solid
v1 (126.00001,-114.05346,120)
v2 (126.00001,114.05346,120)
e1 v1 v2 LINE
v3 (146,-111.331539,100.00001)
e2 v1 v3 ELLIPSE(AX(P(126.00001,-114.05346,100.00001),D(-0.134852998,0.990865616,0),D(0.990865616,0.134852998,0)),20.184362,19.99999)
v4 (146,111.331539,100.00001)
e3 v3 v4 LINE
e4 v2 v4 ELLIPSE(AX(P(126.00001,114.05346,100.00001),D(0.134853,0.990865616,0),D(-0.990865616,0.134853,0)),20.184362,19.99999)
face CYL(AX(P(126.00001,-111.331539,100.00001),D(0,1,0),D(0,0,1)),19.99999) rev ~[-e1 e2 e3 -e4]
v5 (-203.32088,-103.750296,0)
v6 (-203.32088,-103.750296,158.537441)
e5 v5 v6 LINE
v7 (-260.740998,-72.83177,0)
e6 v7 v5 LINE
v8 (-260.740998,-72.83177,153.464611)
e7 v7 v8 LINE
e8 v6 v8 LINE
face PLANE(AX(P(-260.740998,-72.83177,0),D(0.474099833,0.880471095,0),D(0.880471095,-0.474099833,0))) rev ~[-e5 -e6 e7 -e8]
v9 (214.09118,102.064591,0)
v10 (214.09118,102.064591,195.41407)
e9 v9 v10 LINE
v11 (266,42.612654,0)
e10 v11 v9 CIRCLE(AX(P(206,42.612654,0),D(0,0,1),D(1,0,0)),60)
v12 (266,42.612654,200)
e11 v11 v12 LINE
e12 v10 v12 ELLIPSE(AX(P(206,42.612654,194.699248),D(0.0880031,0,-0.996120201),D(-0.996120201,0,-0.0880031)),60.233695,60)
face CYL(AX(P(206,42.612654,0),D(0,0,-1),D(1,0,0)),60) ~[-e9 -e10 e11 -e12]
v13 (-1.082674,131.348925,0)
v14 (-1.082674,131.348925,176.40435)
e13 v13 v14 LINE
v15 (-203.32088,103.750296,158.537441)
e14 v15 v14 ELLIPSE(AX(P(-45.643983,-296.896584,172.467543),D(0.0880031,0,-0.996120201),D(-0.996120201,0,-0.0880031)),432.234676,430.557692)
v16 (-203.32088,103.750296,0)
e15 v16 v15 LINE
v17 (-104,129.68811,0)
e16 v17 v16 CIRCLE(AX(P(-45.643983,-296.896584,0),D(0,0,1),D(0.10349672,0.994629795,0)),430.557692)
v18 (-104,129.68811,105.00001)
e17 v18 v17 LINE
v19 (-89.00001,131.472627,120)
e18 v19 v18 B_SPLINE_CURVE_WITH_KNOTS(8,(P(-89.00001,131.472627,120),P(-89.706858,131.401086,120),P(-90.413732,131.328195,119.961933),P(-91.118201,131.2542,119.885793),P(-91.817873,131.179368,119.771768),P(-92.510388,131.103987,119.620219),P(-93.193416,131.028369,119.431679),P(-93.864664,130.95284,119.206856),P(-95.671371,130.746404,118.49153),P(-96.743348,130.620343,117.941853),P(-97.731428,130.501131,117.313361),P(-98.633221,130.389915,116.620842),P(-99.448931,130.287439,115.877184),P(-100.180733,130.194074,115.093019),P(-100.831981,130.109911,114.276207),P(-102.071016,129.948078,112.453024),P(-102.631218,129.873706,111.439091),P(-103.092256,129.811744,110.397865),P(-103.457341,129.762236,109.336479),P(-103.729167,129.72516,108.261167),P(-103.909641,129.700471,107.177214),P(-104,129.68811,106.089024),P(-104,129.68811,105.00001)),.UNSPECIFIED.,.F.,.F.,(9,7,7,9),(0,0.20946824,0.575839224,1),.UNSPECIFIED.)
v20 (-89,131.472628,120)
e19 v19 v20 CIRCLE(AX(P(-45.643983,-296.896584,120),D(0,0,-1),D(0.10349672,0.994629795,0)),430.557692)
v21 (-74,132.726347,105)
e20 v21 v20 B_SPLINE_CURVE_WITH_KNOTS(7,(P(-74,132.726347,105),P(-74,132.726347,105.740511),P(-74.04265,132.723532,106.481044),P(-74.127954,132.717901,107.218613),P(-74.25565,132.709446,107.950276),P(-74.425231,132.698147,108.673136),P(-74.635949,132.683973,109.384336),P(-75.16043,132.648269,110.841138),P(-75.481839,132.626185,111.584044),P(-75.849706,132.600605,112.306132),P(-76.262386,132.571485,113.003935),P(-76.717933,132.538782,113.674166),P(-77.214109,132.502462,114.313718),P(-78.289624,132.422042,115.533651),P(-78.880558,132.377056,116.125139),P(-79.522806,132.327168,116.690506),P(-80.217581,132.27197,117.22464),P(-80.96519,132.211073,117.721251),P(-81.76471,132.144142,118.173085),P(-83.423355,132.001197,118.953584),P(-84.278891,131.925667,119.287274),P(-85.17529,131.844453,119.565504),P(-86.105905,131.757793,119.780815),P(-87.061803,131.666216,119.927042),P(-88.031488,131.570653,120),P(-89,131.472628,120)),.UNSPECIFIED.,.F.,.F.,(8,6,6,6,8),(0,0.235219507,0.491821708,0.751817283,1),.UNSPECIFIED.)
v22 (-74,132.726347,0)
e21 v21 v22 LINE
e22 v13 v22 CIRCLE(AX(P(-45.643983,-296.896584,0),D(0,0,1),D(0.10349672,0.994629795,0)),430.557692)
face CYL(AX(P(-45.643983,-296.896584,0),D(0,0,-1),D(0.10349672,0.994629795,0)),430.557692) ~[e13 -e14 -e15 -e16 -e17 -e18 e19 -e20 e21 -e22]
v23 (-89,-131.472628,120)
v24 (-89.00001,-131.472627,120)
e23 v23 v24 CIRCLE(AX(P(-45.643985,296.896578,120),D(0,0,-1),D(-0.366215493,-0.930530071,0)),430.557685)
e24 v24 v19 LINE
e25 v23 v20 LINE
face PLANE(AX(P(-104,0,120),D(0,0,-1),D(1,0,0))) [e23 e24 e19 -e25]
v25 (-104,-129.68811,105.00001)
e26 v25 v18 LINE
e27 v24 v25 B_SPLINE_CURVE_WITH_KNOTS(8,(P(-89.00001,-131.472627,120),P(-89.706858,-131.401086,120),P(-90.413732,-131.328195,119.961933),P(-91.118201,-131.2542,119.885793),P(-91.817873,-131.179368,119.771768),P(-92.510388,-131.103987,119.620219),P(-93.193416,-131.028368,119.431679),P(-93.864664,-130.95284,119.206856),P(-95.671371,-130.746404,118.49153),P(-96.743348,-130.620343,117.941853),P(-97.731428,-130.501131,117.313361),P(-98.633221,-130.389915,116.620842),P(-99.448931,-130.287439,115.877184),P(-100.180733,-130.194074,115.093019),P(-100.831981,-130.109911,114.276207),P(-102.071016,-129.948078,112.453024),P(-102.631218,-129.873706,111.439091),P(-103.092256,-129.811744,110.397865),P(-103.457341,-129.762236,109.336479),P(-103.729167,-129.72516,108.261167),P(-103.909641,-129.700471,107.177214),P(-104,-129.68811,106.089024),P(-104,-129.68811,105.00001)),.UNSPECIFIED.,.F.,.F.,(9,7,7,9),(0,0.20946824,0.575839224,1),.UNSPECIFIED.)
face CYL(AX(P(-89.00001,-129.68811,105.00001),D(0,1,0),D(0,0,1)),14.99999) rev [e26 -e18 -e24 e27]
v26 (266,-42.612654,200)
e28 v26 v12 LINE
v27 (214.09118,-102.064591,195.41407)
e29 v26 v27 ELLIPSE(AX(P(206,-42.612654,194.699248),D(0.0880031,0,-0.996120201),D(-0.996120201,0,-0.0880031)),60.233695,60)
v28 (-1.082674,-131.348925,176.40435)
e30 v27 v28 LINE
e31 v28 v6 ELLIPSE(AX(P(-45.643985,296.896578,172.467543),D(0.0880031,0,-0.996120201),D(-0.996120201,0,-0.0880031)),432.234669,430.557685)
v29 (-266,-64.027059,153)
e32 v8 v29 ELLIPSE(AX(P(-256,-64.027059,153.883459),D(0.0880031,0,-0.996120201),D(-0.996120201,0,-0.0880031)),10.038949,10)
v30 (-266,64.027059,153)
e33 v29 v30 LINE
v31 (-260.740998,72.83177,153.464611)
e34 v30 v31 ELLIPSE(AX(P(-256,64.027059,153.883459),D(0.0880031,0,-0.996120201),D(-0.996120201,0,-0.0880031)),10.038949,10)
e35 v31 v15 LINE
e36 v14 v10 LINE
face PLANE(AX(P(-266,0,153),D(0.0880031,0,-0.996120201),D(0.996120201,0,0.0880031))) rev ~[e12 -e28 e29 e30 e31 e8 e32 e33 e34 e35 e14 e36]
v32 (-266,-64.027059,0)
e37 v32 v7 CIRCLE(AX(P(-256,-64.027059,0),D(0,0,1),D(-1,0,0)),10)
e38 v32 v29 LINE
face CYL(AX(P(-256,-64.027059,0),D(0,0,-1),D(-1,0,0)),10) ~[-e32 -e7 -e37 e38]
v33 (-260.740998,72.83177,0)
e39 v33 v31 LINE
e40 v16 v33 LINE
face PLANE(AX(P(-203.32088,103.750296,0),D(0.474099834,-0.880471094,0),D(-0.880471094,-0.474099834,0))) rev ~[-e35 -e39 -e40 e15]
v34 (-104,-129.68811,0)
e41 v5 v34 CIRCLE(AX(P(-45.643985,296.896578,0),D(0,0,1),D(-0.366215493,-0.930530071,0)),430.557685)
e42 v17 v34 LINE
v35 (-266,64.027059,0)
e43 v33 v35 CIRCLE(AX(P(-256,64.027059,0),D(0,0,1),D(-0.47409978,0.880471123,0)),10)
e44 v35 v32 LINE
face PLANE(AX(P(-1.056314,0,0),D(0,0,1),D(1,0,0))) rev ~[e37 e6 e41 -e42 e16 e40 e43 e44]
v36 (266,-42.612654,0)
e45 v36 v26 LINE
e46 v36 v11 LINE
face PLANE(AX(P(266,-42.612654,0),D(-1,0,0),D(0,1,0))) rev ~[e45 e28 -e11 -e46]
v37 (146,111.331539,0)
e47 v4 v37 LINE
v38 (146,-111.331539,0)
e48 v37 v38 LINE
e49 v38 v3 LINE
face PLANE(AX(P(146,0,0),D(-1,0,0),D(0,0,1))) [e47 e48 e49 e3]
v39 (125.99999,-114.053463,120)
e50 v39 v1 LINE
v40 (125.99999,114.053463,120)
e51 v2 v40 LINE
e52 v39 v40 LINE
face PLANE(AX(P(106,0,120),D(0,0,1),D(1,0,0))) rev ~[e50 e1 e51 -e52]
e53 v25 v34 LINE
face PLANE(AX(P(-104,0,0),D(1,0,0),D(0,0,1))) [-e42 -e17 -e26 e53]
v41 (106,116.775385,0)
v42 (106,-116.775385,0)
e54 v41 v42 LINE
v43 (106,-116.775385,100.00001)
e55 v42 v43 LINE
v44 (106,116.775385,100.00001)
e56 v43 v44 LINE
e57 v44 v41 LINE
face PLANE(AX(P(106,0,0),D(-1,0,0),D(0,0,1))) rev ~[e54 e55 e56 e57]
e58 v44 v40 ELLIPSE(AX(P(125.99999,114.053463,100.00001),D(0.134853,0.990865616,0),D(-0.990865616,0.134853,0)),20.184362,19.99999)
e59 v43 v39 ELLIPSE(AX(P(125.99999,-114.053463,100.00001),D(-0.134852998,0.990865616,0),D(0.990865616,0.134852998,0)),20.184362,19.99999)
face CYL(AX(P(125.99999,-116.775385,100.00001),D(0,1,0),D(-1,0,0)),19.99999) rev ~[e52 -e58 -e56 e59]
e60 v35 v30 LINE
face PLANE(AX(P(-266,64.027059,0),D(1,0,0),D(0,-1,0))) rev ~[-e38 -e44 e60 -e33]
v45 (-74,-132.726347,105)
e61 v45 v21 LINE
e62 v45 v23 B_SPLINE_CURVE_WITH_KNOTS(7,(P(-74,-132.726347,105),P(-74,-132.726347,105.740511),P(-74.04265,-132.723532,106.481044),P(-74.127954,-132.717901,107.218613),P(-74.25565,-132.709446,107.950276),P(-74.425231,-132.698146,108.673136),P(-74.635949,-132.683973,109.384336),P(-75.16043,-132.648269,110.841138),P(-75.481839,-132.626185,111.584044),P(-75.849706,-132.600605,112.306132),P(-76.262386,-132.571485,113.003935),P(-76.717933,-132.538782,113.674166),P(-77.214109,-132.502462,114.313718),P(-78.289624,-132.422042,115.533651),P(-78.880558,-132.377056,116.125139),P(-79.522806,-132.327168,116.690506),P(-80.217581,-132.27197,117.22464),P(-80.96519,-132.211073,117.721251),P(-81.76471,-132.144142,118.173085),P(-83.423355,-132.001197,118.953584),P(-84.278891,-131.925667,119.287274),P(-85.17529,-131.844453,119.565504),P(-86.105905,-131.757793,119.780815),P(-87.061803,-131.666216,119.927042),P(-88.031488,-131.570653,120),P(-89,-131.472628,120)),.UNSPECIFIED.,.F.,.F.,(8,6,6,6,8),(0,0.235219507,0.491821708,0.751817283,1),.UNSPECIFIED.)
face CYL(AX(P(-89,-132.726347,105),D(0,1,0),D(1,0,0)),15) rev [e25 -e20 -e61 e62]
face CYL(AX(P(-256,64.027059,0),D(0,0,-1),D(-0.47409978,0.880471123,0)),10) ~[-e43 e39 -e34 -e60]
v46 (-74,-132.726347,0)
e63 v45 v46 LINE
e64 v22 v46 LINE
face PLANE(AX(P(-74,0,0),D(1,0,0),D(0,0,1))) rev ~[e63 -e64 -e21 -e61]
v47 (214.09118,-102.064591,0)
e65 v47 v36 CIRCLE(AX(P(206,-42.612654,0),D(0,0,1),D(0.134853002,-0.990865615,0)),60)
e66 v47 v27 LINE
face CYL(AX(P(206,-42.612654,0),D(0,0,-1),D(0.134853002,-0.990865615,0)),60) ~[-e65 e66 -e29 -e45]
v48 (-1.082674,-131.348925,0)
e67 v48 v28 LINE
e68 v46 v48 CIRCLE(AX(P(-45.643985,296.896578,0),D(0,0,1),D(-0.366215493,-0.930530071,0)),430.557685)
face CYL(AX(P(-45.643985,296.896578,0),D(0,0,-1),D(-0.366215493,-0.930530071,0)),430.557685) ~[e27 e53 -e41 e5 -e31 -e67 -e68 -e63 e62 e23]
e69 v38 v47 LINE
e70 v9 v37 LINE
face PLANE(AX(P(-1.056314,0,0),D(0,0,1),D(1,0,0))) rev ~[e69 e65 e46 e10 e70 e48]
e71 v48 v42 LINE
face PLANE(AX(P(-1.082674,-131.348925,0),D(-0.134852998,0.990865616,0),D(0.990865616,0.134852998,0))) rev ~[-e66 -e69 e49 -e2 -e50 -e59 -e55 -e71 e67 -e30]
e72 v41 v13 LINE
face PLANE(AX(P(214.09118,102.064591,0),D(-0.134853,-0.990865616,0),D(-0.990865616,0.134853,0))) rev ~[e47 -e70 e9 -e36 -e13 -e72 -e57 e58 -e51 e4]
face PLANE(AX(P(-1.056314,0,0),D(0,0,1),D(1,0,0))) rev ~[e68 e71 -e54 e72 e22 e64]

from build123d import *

# Parameters (mm, degrees)
F1_DEPTH = 200
F3_DEPTH = 150
F4_W     = 40
F4_H     = 120
F4_W_2   = 30
F5_DEPTH = 150
F6_R     = 19.99999
F7_R     = 15
F7_R_2   = 14.99999


# Not quite as in the source:
# - a fillet or chamfer is up to 0.001 mm smaller than in the source, because OpenCascade refuses the exact size
# - ends of sketch curves that miss each other by under 0.0002 mm in the source are joined


with BuildPart() as f1:
    # F0 (on Top) → F1 (new body)
    with BuildSketch(Plane.XY):
        with BuildLine():
            Line((-203.32088, 103.750296), (-260.740998, 72.83177))
            ThreePointArc((-260.740998, 72.83177), (-264.5851610502, 69.1549250028), (-266, 64.027059))
            Line((-266, 64.027059), (-266, -64.027059))
            ThreePointArc((-266, -64.027059), (-264.5851610502, -69.1549250028), (-260.7409980515, -72.8317700956))
            Line((-260.7409980515, -72.8317700956), (-203.32088, -103.750296))
            ThreePointArc((-203.32088, -103.750296), (-103.8608632236, -129.7071209998), (-1.082674041, -131.348924606))
            Line((-1.082674041, -131.348924606), (214.09118, -102.064591))
            ThreePointArc((214.09118, -102.064591), (251.1966304028, -82.0748460353), (266, -42.612654))
            Line((266, -42.612654), (266, 42.612654))
            ThreePointArc((266, 42.612654), (251.1966304028, 82.0748460353), (214.0911799923, 102.0645909435))
            Line((214.0911799923, 102.0645909435), (-1.082674, 131.348925))
            ThreePointArc((-1.082674, 131.348925), (-103.8608632236, 129.7071209998), (-203.32088, 103.750296))
        make_face()
    extrude(amount=F1_DEPTH)

    # F2 (on Front) → F3 (cut, symmetric)
    with BuildSketch(Plane.XZ):
        Polygon((266, 200), (-266, 200), (-266, 153), align=None)
    extrude(amount=F3_DEPTH, both=True, mode=Mode.SUBTRACT)

    # F4 (on Front) → F5 (cut, symmetric)
    with BuildSketch(Plane.XZ):
        with Locations((126, 60)):
            Rectangle(F4_W, F4_H)
        with Locations((-89, 60)):
            Rectangle(F4_W_2, F4_H)
    extrude(amount=F5_DEPTH, both=True, mode=Mode.SUBTRACT)

    # F6 (radius 20 in the source; OpenCascade refuses exactly that, so slightly less here)
    f6_edges = [f1.edges().sort_by_distance(p)[0] for p in [
        (146, 0, 120),
        (106, 0, 120),
    ]]
    fillet(f6_edges, radius=F6_R)

    # F7 (call 1 of 2: OpenCascade refuses the feature's edges together)
    f7_edges = [f1.edges().sort_by_distance(p)[0] for p in [
        (-74, 0, 120),
    ]]
    fillet(f7_edges, radius=F7_R)

    # F7#2 (call 2 of 2) (radius 15 in the source; OpenCascade refuses exactly that, so slightly less here)
    f7_2_edges = [f1.edges().sort_by_distance(p)[0] for p in [
        (-104, 0, 120),
    ]]
    fillet(f7_2_edges, radius=F7_R_2)


solid = f1.part
